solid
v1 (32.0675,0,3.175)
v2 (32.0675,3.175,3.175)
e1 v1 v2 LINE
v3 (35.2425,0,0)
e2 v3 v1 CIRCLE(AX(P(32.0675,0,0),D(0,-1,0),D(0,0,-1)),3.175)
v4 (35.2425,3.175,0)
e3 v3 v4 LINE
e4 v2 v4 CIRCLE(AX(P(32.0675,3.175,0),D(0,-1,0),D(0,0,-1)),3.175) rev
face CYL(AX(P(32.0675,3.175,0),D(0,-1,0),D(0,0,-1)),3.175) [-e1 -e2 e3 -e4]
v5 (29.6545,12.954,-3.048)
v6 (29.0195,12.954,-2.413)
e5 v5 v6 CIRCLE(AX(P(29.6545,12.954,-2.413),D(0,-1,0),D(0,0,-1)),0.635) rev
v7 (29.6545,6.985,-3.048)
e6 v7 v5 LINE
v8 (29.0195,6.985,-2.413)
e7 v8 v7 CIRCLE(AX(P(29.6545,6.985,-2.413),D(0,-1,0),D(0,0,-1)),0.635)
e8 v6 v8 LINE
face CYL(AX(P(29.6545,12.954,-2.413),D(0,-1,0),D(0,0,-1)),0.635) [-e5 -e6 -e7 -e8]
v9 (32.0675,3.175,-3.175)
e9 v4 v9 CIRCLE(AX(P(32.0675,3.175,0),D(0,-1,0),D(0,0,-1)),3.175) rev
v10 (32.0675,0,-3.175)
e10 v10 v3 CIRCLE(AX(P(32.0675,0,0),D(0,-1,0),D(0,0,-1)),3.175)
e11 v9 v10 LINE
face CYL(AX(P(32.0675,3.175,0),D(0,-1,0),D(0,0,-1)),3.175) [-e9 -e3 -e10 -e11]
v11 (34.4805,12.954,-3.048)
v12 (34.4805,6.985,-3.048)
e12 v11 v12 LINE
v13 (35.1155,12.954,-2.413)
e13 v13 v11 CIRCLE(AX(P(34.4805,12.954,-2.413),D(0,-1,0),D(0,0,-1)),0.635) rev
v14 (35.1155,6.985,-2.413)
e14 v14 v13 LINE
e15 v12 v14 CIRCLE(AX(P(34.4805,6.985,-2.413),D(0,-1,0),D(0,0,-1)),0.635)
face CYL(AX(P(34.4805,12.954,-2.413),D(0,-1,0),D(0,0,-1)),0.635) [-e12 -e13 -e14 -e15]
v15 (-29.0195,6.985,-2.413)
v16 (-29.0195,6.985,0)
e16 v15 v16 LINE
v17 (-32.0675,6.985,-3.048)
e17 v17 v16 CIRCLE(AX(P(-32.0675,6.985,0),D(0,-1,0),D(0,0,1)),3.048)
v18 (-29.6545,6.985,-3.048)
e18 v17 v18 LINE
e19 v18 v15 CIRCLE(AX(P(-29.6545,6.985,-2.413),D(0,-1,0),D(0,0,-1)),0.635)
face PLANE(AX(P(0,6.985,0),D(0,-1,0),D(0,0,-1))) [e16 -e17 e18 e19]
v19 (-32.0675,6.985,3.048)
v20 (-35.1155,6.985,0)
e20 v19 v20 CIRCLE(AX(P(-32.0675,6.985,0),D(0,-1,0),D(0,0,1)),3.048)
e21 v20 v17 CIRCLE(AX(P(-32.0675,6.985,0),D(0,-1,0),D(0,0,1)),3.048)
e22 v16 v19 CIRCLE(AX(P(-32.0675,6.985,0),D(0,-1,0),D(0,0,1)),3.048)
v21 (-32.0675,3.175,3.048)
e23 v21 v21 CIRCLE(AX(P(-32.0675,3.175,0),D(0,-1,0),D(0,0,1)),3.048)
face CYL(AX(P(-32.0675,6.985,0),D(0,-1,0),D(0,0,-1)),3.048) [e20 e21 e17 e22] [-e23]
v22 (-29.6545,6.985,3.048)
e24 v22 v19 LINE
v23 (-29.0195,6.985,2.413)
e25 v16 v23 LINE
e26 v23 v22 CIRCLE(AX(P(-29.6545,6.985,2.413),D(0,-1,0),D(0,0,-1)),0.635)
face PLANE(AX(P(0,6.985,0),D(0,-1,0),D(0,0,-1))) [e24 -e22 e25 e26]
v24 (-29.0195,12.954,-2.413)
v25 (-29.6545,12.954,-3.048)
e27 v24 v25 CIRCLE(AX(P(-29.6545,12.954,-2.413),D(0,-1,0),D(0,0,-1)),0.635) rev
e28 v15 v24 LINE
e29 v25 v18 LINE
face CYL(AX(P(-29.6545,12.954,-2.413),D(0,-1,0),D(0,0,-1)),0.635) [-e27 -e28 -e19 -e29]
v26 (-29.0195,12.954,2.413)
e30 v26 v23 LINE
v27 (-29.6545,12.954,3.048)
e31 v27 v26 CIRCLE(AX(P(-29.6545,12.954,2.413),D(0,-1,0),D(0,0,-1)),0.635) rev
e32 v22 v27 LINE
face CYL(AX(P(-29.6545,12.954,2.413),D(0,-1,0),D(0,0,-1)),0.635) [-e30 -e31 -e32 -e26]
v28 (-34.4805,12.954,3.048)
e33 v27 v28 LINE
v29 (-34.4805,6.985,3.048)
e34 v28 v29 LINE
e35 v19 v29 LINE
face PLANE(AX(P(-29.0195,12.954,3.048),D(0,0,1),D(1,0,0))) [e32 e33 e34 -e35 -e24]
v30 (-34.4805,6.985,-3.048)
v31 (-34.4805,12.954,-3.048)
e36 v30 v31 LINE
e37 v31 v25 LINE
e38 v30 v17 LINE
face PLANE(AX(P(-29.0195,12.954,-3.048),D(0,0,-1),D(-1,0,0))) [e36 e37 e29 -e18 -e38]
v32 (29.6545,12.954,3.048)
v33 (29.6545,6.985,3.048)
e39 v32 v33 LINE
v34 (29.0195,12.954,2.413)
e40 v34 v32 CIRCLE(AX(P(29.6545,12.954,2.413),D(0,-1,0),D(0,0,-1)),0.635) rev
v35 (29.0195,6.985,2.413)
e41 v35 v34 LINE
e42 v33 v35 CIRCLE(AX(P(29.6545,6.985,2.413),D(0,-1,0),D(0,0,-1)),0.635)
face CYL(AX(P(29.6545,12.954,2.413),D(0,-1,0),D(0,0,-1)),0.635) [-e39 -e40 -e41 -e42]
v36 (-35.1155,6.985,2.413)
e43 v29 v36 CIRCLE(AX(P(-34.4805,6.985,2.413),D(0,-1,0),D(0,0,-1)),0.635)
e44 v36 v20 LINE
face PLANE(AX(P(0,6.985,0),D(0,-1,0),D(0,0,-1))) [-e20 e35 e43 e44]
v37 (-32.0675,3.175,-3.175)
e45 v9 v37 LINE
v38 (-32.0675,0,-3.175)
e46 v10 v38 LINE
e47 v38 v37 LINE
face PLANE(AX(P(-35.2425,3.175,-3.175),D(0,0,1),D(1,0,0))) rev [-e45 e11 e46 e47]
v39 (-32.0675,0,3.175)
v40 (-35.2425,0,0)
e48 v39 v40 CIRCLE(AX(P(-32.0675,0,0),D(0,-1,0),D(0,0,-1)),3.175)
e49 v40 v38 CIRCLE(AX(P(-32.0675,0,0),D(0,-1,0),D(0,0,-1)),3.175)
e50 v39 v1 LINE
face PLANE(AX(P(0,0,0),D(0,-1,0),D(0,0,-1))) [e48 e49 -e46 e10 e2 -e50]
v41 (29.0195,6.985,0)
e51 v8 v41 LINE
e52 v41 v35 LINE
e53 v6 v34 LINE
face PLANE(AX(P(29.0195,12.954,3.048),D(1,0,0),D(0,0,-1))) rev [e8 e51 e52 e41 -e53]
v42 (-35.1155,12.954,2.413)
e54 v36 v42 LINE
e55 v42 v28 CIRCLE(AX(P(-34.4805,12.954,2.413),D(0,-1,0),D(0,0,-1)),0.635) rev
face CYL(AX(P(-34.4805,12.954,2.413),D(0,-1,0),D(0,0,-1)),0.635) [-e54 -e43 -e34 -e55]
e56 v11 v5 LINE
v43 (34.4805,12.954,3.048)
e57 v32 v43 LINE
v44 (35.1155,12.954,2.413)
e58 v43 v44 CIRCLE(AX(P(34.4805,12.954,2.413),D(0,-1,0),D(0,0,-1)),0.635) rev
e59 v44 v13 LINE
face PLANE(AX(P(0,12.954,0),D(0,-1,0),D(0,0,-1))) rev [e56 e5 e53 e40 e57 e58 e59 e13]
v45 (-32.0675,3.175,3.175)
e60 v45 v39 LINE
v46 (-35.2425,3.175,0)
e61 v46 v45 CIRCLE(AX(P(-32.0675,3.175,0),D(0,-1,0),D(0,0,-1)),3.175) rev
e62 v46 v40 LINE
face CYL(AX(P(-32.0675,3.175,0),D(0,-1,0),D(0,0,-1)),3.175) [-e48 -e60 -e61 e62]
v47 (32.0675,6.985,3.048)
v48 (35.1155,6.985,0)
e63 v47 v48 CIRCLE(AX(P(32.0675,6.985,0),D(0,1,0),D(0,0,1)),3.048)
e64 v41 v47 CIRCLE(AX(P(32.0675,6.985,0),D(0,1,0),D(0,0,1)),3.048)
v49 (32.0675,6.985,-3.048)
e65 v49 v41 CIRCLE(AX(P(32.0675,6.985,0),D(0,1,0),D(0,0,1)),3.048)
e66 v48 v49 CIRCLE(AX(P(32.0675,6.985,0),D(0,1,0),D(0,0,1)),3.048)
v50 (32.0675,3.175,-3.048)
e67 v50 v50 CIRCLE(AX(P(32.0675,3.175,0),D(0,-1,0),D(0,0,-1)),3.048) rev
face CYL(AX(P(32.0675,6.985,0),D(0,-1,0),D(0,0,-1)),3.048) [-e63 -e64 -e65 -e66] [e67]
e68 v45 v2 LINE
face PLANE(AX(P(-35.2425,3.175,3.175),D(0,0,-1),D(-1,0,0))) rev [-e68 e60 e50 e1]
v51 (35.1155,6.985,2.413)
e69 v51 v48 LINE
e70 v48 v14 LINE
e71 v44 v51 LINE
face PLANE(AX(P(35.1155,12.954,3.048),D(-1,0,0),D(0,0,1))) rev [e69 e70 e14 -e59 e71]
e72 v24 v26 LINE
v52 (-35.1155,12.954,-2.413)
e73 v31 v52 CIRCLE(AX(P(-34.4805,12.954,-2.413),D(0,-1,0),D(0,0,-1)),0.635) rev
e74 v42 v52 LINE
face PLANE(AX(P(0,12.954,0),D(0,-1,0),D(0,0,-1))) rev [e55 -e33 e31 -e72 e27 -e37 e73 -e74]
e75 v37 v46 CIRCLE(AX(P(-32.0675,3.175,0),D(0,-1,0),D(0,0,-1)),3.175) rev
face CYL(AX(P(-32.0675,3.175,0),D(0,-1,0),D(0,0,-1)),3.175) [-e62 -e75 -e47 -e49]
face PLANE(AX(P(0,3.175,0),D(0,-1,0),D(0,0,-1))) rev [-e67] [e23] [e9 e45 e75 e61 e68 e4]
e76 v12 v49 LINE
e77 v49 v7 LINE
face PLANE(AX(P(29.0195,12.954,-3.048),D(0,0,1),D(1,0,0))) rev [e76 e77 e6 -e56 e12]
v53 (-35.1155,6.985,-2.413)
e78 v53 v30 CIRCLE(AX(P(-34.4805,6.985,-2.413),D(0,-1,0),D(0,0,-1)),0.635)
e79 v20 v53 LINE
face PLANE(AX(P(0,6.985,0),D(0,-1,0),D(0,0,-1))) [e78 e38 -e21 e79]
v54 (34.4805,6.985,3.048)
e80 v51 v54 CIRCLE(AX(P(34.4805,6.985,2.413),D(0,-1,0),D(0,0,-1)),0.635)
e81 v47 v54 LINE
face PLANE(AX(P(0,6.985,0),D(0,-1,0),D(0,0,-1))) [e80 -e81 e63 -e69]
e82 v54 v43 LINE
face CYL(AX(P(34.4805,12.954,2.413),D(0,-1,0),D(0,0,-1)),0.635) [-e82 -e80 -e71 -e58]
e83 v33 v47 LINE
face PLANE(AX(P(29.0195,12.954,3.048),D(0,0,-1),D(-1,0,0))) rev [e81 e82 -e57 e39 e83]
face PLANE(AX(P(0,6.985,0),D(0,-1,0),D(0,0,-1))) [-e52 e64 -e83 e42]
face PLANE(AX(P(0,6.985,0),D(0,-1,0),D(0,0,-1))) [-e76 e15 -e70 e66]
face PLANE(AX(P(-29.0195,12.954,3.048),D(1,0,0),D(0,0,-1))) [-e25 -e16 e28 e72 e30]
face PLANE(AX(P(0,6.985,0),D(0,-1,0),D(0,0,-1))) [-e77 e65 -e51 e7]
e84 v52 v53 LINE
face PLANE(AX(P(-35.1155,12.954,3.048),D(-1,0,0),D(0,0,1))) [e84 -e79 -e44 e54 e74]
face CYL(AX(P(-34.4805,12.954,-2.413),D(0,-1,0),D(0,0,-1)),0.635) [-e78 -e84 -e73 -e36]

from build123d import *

# Parameters (mm, degrees)
SKETCH1_W            = 70.485
SKETCH1_H            = 6.35
BOSS_EXTRUDE1_DEPTH  = 3.175
SKETCH2_R            = 3.048
BOSS_EXTRUDE2_DEPTH  = 3.81
SKETCH3_W            = 6.096
SKETCH3_H            = 6.096
BOSS_EXTRUDE3_DEPTH  = 5.969
FILLET1_R            = 3.175
FILLET2_R            = 0.635
FILLET2_OF_MIRROR1_R = 0.635


with BuildPart() as part:
    # Sketch1 → Boss-Extrude1 (new body)
    with BuildSketch(Plane(origin=(0, 0, 0), x_dir=(1, 0, 0), z_dir=(0, 1, 0))):
        Rectangle(SKETCH1_W, SKETCH1_H)
    extrude(amount=BOSS_EXTRUDE1_DEPTH)

    # Sketch2 → Boss-Extrude2 (add)
    with BuildSketch(Plane(origin=(0, 3.175, 0), x_dir=(1, 0, 0), z_dir=(0, 1, 0))):
        with Locations(Location((32.0675, 0, 0), (0, 0, 90))):
            Circle(SKETCH2_R)
    boss_extrude2 = extrude(amount=BOSS_EXTRUDE2_DEPTH)

    # Sketch3 → Boss-Extrude3 (add)
    with BuildSketch(Plane(origin=(0, 6.985, 0), x_dir=(1, 0, 0), z_dir=(0, 1, 0))):
        with Locations((32.0675, 0)):
            Rectangle(SKETCH3_W, SKETCH3_H)
    boss_extrude3 = extrude(amount=BOSS_EXTRUDE3_DEPTH)

    # Fillet1
    fillet1_edges = [part.edges().sort_by_distance(p)[0] for p in [
        (-35.2425, 1.5875, 3.175),
        (-35.2425, 1.5875, -3.175),
        (35.2425, 1.5875, 3.175),
        (35.2425, 1.5875, -3.175),
    ]]
    fillet(fillet1_edges, radius=FILLET1_R - 0.0001)  # a hair under: the kernel refuses the full size

    # Fillet2
    fillet2_edges = [part.edges().sort_by_distance(p)[0] for p in [
        (35.1155, 9.9695, 3.048),
        (35.1155, 9.9695, -3.048),
        (29.0195, 9.9695, -3.048),
        (29.0195, 9.9695, 3.048),
    ]]
    fillet(fillet2_edges, radius=FILLET2_R)

    # Mirror1: Boss-Extrude2, Boss-Extrude3 across plane
    add(boss_extrude2.mirror(Plane(origin=(0, 0, 0), x_dir=(0, 0, 1), z_dir=(1, 0, 0))))
    add(boss_extrude3.mirror(Plane(origin=(0, 0, 0), x_dir=(0, 0, 1), z_dir=(1, 0, 0))))

    # Fillet2 of Mirror1
    fillet2_of_mirror1_edges = [part.edges().sort_by_distance(p)[0] for p in [
        (-35.1155, 9.9695, 3.048),
        (-35.1155, 9.9695, -3.048),
        (-29.0195, 9.9695, -3.048),
        (-29.0195, 9.9695, 3.048),
    ]]
    fillet(fillet2_of_mirror1_edges, radius=FILLET2_OF_MIRROR1_R)


solid = part.part
